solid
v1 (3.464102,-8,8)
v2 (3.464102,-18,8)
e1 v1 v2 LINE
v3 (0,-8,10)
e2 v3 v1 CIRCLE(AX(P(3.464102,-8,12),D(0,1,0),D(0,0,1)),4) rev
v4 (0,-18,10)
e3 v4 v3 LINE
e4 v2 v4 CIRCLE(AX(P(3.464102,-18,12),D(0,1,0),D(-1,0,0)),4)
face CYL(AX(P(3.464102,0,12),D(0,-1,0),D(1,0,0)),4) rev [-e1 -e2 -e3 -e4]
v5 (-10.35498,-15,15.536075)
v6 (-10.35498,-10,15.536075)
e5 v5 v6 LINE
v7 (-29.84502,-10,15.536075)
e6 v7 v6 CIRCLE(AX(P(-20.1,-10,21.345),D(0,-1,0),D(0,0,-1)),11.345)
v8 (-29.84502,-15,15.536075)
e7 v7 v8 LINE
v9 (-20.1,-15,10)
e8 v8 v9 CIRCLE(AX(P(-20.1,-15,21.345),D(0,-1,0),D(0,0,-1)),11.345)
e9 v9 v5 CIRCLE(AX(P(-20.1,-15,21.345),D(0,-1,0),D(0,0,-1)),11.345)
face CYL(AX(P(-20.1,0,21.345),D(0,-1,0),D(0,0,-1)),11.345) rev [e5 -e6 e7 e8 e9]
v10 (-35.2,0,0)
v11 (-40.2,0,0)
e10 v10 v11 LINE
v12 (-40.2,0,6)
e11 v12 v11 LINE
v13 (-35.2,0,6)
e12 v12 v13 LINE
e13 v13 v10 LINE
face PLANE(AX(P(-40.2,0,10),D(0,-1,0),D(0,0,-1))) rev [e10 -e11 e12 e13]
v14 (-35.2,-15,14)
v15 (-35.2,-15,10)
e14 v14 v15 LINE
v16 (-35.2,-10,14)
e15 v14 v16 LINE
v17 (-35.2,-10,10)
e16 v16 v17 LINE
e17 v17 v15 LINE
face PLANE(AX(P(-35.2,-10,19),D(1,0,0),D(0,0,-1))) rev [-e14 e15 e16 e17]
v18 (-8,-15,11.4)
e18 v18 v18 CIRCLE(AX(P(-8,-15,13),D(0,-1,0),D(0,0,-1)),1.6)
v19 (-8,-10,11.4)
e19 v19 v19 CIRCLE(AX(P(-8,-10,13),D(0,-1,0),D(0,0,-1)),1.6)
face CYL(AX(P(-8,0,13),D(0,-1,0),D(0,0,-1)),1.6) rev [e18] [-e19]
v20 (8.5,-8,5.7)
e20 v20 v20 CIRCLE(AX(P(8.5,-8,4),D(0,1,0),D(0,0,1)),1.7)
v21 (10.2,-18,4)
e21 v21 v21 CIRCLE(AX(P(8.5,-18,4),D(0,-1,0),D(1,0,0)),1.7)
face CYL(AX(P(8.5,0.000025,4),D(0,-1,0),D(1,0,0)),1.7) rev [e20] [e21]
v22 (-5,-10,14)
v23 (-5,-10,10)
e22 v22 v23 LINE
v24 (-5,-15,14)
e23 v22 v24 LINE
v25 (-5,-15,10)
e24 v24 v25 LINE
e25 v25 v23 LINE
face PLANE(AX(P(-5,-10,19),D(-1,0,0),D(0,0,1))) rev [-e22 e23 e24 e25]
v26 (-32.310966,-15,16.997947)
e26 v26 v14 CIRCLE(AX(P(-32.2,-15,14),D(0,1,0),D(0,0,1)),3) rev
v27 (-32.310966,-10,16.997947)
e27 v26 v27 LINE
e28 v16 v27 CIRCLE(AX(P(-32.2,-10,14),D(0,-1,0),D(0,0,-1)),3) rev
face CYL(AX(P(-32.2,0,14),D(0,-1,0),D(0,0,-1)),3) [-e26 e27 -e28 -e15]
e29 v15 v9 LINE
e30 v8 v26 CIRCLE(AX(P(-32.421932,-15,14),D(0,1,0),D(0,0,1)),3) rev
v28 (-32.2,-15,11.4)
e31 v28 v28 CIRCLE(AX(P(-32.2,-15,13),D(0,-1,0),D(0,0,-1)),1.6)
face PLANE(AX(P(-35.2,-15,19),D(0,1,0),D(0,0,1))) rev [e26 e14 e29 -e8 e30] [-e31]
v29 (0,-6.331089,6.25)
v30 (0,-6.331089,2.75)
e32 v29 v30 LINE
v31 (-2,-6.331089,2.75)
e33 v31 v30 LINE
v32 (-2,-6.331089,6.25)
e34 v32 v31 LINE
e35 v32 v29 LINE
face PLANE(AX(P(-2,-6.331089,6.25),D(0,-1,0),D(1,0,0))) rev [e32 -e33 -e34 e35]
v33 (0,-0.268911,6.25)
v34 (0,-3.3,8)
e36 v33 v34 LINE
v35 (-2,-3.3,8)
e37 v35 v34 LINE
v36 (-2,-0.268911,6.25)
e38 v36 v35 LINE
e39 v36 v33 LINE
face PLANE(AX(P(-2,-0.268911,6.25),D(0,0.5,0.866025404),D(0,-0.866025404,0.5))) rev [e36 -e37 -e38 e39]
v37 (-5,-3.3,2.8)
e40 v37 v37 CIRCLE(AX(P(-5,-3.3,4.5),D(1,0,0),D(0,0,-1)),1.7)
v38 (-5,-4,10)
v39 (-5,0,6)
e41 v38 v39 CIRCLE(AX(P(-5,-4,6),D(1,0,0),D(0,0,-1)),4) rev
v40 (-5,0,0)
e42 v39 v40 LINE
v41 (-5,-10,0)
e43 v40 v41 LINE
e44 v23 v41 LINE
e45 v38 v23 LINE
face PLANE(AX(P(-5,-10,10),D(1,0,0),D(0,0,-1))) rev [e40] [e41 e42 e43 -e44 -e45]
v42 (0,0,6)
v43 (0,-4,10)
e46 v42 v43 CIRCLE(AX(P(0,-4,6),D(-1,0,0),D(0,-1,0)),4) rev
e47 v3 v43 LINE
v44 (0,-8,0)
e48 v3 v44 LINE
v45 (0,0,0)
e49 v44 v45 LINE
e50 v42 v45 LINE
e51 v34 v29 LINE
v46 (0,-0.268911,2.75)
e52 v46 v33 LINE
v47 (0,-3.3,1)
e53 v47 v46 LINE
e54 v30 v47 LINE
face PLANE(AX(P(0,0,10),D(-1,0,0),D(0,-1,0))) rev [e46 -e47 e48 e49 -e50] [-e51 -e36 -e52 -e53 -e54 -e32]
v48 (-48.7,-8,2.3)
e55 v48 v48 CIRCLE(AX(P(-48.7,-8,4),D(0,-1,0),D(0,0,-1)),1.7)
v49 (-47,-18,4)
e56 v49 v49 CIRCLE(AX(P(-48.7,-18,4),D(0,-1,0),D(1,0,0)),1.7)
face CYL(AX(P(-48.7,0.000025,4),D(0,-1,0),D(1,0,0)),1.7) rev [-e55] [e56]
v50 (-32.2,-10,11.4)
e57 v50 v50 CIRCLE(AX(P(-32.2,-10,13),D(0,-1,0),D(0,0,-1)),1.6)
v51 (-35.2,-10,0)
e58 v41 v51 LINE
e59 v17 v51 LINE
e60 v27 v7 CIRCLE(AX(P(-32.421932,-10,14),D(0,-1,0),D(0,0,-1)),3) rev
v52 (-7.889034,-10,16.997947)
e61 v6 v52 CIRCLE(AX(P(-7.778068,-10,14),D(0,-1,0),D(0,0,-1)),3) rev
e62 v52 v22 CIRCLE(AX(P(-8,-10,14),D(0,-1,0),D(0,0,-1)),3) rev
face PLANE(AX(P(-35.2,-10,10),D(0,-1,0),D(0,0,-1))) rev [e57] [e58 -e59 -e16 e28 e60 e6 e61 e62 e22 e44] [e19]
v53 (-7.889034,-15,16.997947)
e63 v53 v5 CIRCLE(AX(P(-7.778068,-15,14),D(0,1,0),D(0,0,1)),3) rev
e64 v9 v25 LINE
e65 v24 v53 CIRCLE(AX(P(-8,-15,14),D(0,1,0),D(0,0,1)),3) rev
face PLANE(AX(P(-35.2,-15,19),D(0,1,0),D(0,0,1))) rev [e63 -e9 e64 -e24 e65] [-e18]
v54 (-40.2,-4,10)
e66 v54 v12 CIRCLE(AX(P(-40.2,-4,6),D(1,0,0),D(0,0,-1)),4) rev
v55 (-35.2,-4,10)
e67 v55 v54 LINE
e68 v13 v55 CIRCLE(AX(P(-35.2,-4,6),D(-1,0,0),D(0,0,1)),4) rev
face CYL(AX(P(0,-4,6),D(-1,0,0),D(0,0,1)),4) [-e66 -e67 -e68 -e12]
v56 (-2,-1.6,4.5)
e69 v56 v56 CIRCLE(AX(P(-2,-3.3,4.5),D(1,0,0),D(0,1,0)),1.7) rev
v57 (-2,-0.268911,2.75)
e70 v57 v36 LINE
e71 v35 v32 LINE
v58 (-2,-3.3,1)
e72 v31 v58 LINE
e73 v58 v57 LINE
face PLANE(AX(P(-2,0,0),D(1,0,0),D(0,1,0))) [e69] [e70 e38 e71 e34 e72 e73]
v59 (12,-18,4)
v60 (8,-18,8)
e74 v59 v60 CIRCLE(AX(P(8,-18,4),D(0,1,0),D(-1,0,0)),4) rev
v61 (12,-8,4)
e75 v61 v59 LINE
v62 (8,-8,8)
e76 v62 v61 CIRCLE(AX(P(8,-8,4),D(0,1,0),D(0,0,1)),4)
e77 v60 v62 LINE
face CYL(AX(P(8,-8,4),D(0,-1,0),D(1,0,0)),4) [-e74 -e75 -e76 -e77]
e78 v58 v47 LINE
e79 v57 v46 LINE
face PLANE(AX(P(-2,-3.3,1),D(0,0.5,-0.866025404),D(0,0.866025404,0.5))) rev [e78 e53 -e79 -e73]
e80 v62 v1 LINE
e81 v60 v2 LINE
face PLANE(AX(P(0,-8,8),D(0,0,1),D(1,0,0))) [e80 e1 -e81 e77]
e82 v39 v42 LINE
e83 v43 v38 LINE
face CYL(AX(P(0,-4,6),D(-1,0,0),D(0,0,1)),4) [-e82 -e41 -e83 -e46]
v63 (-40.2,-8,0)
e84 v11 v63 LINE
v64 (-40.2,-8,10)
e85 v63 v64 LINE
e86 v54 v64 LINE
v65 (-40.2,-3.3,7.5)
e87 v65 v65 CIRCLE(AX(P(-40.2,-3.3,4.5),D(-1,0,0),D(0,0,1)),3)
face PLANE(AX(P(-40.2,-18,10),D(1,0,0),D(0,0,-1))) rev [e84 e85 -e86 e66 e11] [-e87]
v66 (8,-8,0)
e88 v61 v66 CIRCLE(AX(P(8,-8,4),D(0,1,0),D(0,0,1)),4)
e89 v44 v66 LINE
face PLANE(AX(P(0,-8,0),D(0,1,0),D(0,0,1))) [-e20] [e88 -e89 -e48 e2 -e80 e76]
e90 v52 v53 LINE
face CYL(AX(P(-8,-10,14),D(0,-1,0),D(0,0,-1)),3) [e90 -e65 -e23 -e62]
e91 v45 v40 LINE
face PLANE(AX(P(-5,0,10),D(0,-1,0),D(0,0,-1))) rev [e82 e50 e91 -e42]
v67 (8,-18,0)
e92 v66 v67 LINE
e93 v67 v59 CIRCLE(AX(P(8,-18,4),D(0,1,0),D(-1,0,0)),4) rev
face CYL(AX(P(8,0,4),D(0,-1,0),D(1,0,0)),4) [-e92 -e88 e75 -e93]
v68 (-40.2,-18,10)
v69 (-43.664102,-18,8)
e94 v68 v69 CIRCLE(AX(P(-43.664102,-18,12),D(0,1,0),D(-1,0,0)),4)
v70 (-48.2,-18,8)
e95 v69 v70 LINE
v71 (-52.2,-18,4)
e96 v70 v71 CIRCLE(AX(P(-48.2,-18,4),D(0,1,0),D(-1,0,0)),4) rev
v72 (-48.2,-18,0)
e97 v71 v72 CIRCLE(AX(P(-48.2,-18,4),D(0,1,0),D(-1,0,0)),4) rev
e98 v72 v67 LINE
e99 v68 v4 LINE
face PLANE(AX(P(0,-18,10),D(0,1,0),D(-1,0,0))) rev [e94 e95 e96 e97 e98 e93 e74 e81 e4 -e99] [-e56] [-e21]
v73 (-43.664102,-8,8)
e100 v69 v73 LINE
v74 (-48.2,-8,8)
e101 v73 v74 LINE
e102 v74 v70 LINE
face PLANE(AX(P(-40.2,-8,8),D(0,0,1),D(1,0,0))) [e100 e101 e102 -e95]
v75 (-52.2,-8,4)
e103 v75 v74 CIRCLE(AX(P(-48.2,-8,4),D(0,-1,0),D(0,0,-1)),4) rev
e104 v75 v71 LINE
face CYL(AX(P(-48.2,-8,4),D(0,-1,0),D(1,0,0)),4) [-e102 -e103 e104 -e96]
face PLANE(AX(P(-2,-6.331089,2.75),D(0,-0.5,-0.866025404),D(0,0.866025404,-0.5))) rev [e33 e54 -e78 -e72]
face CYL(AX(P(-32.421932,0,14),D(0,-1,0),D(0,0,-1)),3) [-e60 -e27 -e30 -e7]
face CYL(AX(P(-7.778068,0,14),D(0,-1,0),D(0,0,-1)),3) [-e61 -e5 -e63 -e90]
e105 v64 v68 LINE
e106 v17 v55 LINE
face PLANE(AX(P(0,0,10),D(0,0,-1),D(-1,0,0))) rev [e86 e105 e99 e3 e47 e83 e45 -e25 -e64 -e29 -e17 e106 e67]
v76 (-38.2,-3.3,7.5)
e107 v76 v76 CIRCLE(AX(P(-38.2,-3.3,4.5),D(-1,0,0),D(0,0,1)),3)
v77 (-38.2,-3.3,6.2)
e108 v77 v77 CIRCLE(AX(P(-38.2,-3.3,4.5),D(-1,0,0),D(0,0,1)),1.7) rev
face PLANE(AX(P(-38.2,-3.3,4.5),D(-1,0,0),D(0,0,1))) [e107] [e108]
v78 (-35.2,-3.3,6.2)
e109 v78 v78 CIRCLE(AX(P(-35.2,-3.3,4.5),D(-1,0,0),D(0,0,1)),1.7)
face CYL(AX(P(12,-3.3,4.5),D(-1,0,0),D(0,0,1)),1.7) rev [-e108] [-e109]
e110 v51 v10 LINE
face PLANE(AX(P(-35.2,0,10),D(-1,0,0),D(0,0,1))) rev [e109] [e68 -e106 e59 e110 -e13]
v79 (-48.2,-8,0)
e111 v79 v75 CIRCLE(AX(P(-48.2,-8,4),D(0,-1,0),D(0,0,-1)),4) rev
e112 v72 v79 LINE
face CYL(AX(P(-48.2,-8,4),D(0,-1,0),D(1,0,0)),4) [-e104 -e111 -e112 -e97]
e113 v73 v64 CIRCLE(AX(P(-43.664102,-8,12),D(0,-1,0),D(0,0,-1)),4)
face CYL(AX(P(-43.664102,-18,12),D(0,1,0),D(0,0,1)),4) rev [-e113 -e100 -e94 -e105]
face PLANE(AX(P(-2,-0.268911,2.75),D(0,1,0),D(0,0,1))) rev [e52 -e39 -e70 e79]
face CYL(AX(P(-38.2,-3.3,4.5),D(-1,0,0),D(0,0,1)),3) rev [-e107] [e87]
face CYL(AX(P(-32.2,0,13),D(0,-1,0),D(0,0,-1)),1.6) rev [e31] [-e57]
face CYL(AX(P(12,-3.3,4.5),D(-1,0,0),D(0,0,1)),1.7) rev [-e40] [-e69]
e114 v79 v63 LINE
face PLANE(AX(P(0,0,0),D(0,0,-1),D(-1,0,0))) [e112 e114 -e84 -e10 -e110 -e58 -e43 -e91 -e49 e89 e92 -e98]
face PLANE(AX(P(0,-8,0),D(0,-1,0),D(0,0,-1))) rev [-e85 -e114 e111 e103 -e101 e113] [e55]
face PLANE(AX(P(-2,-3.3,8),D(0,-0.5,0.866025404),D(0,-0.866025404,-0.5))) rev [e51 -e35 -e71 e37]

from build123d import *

# Parameters (mm, degrees)
BOSS_EXTRU_1_DEPTH           = 10
ESQUISSE2_W                  = 30.2
ESQUISSE2_H                  = 5
BOSS_EXTRU_2_DEPTH           = 9
ENL_V_MAT_EXTRU_1_DEPTH      = 47.925899032
ESQUISSE4_R                  = 1.6
ENL_V_MAT_EXTRU_2_DEPTH      = 47.925899032
ESQUISSE5_W                  = 30.2
ESQUISSE5_H                  = 2
ENL_V_MAT_EXTRU_3_DEPTH      = 47.925899032
CONG_2_R                     = 3
ESQUISSE6_W                  = 12
ESQUISSE6_H                  = 8
BOSS_EXTRU_3_DEPTH           = 10
ESQUISSE7_R                  = 1.7
ENL_V_MAT_EXTRU_4_DEPTH      = 58.773438571
CONG_3_R                     = 4
ENL_V_MAT_EXTRU_5_DEPTH      = 54.298876201
ENL_V_MAT_EXTRU_5_DEPTH_BACK = 54.298876201
ESQUISSE8_R                  = 1.7
ESQUISSE9_R                  = 3
ENL_V_MAT_EXTRU_6_DEPTH      = 2
ENL_V_MAT_EXTRU_7_DEPTH      = 2
CONG_4_R                     = 4
CONG_5_R                     = 4


# Some blends are built 0.0001 mm under size
with BuildPart() as part:
    # Esquisse1 → Boss.-Extru.1 (new body)
    with BuildSketch(Plane.XY):
        Polygon((-40.2, 0), (-35.2, 0), (-35.2, -10), (-5, -10), (-5, 0), (0, 0), (0, -18), (-40.2, -18), align=None)
    extrude(amount=BOSS_EXTRU_1_DEPTH)

    # Esquisse2 → Boss.-Extru.2 (add)
    with BuildSketch(Plane.XY.offset(10)):
        with Locations((-20.1, -12.5)):
            Rectangle(ESQUISSE2_W, ESQUISSE2_H)
    extrude(amount=BOSS_EXTRU_2_DEPTH)

    # Esquisse3 → Enlèv. mat.-Extru.1 (cut, through all)
    with BuildSketch(Plane.XZ.offset(15)):
        with BuildLine():
            Line((-31.2, 19), (-9, 19))
            ThreePointArc((-9, 19), (-20.1, 10), (-31.2, 19))
        make_face()
    extrude(amount=-ENL_V_MAT_EXTRU_1_DEPTH, mode=Mode.SUBTRACT)

    # Esquisse4 → Enlèv. mat.-Extru.2 (cut, through all)
    with BuildSketch(Plane.XZ.offset(15)):
        with Locations(Location((-32.2, 13, 0), (0, 0, 270))):
            Circle(ESQUISSE4_R)
        with Locations(Location((-8, 13, 0), (0, 0, 270))):
            Circle(ESQUISSE4_R)
    extrude(amount=-ENL_V_MAT_EXTRU_2_DEPTH, mode=Mode.SUBTRACT)

    # Esquisse5 → Enlèv. mat.-Extru.3 (cut, through all)
    with BuildSketch(Plane.XZ.offset(15)):
        with Locations((-20.1, 18)):
            Rectangle(ESQUISSE5_W, ESQUISSE5_H)
    extrude(amount=-ENL_V_MAT_EXTRU_3_DEPTH, mode=Mode.SUBTRACT)

    # Congé2
    # the kernel refuses this fillet: 3 mm, written as the material it takes off along each edge
    with BuildSketch(Plane(origin=(-5, -22.5, 17), x_dir=(0, 0, -1), z_dir=(0, 1, 0))) as cong_2_piece_1:
        with BuildLine():
            CenterArc((CONG_2_R, CONG_2_R), CONG_2_R, 180, 90)
            Line((0, CONG_2_R), (0, 0))
            Line((0, 0), (CONG_2_R, 0))
        make_face()
    extrude(amount=20, mode=Mode.SUBTRACT)
    with BuildSketch(Plane(origin=(-9.620019084, -5.395123123, 17), x_dir=(1, 0, 0), z_dir=(0, -1, 0))) as cong_2_piece_2:
        with BuildLine():
            CenterArc((1.841950751, -3), CONG_2_R, 90, 59.201185251)
            ThreePointArc((-0.734960717, -1.463924712), (-0.341024539, -0.745244452), (0, 0))
            Line((0, 0), (1.841950751, 0))
        make_face()
    extrude(amount=14.209753754, mode=Mode.SUBTRACT)
    with BuildSketch(Plane(origin=(-30.579980916, -5.395123123, 17), x_dir=(0.4486773426104955, 0, -0.8936938190610831), z_dir=(0, -1, 0))) as cong_2_piece_3:
        with BuildLine():
            CenterArc((1.854639889, -2.992172029), CONG_2_R, 94.139959503, 59.201185251)
            Line((-0.826441568, -1.646140001), (0, 0))
            ThreePointArc((0, 0), (0.819030344, -0.029602778), (1.638060688, 0))
        make_face()
    extrude(amount=14.209753754, mode=Mode.SUBTRACT)
    with BuildSketch(Plane(origin=(-35.2, -22.5, 17), x_dir=(0, 0, -1), z_dir=(0, 1, 0))) as cong_2_piece_4:
        with BuildLine():
            CenterArc((CONG_2_R, -CONG_2_R), CONG_2_R, 90, 90)
            Line((0, -CONG_2_R), (0, 0))
            Line((0, 0), (CONG_2_R, 0))
        make_face()
    extrude(amount=20, mode=Mode.SUBTRACT)

    # Esquisse6 → Boss.-Extru.3 (add)
    with BuildSketch(Plane.XZ.offset(18)):
        with Locations((-46.2, 4)):
            Rectangle(ESQUISSE6_W, ESQUISSE6_H)
        with Locations((6, 4)):
            Rectangle(ESQUISSE6_W, ESQUISSE6_H)
    extrude(amount=-BOSS_EXTRU_3_DEPTH)

    # Esquisse7 → Enlèv. mat.-Extru.4 (cut, through all)
    with BuildSketch(Plane.XZ.offset(18)):
        with Locations((-48.7, 4)):
            Circle(ESQUISSE7_R)
        with Locations((8.5, 4)):
            Circle(ESQUISSE7_R)
    extrude(amount=-ENL_V_MAT_EXTRU_4_DEPTH, mode=Mode.SUBTRACT)

    # Congé3
    cong_3_edges = [part.edges().sort_by_distance(p)[0] for p in [
        (-52.2, -13, 8),
        (-52.2, -13, 0),
        (12, -13, 0),
        (12, -13, 8),
    ]]
    fillet(cong_3_edges, radius=CONG_3_R - 0.0001)  # a hair under: the kernel refuses the full size

    # Esquisse8 → Enlèv. mat.-Extru.5 (cut, two sides: drawn at the far end of the back side and taken through both)
    with BuildSketch(Plane.ZY.offset(5).offset(-ENL_V_MAT_EXTRU_5_DEPTH_BACK)):
        with Locations((4.5, -3.3)):
            Circle(ESQUISSE8_R)
    extrude(amount=ENL_V_MAT_EXTRU_5_DEPTH + ENL_V_MAT_EXTRU_5_DEPTH_BACK, mode=Mode.SUBTRACT)

    # Esquisse9 → Enlèv. mat.-Extru.6 (cut)
    with BuildSketch(Plane.ZY.offset(40.2)):
        with Locations((4.5, -3.3)):
            Circle(ESQUISSE9_R)
    extrude(amount=-ENL_V_MAT_EXTRU_6_DEPTH, mode=Mode.SUBTRACT)

    # Esquisse10 → Enlèv. mat.-Extru.7 (cut)
    with BuildSketch(Plane(origin=(0, 0, 0), x_dir=(0, 0, -1), z_dir=(1, 0, 0))):
        Polygon((-8, -3.3), (-6.25, -6.331088913), (-2.75, -6.331088913), (-1, -3.3), (-2.75, -0.268911087), (-6.25, -0.268911087), align=None)
    extrude(amount=-ENL_V_MAT_EXTRU_7_DEPTH, mode=Mode.SUBTRACT)

    # Congé4
    cong_4_edges = [part.edges().sort_by_distance(p)[0] for p in [
        (-2.5, 0, 10),
        (-37.7, 0, 10),
    ]]
    fillet(cong_4_edges, radius=CONG_4_R)

    # Congé5
    # the kernel refuses this fillet: 4 mm, written as the material it adds along each edge
    with BuildSketch(Plane(origin=(0, -18, 8), x_dir=(0, 0, 1), z_dir=(0, 1, 0))) as cong_5_piece_1:
        with BuildLine():
            CenterArc((4, 3.464101615), CONG_5_R, 180, 60)
            Line((0, 3.464101615), (0, 0))
            Line((0, 0), (2, 0))
        make_face()
    extrude(amount=10)
    with BuildSketch(Plane(origin=(-40.2, -18, 8), x_dir=(0, 0, 1), z_dir=(0, 1, 0))) as cong_5_piece_2:
        with BuildLine():
            CenterArc((4, -3.464101615), CONG_5_R, 120, 60)
            Line((0, -3.464101615), (0, 0))
            Line((0, 0), (2, 0))
        make_face()
    extrude(amount=10)


solid = part.part
